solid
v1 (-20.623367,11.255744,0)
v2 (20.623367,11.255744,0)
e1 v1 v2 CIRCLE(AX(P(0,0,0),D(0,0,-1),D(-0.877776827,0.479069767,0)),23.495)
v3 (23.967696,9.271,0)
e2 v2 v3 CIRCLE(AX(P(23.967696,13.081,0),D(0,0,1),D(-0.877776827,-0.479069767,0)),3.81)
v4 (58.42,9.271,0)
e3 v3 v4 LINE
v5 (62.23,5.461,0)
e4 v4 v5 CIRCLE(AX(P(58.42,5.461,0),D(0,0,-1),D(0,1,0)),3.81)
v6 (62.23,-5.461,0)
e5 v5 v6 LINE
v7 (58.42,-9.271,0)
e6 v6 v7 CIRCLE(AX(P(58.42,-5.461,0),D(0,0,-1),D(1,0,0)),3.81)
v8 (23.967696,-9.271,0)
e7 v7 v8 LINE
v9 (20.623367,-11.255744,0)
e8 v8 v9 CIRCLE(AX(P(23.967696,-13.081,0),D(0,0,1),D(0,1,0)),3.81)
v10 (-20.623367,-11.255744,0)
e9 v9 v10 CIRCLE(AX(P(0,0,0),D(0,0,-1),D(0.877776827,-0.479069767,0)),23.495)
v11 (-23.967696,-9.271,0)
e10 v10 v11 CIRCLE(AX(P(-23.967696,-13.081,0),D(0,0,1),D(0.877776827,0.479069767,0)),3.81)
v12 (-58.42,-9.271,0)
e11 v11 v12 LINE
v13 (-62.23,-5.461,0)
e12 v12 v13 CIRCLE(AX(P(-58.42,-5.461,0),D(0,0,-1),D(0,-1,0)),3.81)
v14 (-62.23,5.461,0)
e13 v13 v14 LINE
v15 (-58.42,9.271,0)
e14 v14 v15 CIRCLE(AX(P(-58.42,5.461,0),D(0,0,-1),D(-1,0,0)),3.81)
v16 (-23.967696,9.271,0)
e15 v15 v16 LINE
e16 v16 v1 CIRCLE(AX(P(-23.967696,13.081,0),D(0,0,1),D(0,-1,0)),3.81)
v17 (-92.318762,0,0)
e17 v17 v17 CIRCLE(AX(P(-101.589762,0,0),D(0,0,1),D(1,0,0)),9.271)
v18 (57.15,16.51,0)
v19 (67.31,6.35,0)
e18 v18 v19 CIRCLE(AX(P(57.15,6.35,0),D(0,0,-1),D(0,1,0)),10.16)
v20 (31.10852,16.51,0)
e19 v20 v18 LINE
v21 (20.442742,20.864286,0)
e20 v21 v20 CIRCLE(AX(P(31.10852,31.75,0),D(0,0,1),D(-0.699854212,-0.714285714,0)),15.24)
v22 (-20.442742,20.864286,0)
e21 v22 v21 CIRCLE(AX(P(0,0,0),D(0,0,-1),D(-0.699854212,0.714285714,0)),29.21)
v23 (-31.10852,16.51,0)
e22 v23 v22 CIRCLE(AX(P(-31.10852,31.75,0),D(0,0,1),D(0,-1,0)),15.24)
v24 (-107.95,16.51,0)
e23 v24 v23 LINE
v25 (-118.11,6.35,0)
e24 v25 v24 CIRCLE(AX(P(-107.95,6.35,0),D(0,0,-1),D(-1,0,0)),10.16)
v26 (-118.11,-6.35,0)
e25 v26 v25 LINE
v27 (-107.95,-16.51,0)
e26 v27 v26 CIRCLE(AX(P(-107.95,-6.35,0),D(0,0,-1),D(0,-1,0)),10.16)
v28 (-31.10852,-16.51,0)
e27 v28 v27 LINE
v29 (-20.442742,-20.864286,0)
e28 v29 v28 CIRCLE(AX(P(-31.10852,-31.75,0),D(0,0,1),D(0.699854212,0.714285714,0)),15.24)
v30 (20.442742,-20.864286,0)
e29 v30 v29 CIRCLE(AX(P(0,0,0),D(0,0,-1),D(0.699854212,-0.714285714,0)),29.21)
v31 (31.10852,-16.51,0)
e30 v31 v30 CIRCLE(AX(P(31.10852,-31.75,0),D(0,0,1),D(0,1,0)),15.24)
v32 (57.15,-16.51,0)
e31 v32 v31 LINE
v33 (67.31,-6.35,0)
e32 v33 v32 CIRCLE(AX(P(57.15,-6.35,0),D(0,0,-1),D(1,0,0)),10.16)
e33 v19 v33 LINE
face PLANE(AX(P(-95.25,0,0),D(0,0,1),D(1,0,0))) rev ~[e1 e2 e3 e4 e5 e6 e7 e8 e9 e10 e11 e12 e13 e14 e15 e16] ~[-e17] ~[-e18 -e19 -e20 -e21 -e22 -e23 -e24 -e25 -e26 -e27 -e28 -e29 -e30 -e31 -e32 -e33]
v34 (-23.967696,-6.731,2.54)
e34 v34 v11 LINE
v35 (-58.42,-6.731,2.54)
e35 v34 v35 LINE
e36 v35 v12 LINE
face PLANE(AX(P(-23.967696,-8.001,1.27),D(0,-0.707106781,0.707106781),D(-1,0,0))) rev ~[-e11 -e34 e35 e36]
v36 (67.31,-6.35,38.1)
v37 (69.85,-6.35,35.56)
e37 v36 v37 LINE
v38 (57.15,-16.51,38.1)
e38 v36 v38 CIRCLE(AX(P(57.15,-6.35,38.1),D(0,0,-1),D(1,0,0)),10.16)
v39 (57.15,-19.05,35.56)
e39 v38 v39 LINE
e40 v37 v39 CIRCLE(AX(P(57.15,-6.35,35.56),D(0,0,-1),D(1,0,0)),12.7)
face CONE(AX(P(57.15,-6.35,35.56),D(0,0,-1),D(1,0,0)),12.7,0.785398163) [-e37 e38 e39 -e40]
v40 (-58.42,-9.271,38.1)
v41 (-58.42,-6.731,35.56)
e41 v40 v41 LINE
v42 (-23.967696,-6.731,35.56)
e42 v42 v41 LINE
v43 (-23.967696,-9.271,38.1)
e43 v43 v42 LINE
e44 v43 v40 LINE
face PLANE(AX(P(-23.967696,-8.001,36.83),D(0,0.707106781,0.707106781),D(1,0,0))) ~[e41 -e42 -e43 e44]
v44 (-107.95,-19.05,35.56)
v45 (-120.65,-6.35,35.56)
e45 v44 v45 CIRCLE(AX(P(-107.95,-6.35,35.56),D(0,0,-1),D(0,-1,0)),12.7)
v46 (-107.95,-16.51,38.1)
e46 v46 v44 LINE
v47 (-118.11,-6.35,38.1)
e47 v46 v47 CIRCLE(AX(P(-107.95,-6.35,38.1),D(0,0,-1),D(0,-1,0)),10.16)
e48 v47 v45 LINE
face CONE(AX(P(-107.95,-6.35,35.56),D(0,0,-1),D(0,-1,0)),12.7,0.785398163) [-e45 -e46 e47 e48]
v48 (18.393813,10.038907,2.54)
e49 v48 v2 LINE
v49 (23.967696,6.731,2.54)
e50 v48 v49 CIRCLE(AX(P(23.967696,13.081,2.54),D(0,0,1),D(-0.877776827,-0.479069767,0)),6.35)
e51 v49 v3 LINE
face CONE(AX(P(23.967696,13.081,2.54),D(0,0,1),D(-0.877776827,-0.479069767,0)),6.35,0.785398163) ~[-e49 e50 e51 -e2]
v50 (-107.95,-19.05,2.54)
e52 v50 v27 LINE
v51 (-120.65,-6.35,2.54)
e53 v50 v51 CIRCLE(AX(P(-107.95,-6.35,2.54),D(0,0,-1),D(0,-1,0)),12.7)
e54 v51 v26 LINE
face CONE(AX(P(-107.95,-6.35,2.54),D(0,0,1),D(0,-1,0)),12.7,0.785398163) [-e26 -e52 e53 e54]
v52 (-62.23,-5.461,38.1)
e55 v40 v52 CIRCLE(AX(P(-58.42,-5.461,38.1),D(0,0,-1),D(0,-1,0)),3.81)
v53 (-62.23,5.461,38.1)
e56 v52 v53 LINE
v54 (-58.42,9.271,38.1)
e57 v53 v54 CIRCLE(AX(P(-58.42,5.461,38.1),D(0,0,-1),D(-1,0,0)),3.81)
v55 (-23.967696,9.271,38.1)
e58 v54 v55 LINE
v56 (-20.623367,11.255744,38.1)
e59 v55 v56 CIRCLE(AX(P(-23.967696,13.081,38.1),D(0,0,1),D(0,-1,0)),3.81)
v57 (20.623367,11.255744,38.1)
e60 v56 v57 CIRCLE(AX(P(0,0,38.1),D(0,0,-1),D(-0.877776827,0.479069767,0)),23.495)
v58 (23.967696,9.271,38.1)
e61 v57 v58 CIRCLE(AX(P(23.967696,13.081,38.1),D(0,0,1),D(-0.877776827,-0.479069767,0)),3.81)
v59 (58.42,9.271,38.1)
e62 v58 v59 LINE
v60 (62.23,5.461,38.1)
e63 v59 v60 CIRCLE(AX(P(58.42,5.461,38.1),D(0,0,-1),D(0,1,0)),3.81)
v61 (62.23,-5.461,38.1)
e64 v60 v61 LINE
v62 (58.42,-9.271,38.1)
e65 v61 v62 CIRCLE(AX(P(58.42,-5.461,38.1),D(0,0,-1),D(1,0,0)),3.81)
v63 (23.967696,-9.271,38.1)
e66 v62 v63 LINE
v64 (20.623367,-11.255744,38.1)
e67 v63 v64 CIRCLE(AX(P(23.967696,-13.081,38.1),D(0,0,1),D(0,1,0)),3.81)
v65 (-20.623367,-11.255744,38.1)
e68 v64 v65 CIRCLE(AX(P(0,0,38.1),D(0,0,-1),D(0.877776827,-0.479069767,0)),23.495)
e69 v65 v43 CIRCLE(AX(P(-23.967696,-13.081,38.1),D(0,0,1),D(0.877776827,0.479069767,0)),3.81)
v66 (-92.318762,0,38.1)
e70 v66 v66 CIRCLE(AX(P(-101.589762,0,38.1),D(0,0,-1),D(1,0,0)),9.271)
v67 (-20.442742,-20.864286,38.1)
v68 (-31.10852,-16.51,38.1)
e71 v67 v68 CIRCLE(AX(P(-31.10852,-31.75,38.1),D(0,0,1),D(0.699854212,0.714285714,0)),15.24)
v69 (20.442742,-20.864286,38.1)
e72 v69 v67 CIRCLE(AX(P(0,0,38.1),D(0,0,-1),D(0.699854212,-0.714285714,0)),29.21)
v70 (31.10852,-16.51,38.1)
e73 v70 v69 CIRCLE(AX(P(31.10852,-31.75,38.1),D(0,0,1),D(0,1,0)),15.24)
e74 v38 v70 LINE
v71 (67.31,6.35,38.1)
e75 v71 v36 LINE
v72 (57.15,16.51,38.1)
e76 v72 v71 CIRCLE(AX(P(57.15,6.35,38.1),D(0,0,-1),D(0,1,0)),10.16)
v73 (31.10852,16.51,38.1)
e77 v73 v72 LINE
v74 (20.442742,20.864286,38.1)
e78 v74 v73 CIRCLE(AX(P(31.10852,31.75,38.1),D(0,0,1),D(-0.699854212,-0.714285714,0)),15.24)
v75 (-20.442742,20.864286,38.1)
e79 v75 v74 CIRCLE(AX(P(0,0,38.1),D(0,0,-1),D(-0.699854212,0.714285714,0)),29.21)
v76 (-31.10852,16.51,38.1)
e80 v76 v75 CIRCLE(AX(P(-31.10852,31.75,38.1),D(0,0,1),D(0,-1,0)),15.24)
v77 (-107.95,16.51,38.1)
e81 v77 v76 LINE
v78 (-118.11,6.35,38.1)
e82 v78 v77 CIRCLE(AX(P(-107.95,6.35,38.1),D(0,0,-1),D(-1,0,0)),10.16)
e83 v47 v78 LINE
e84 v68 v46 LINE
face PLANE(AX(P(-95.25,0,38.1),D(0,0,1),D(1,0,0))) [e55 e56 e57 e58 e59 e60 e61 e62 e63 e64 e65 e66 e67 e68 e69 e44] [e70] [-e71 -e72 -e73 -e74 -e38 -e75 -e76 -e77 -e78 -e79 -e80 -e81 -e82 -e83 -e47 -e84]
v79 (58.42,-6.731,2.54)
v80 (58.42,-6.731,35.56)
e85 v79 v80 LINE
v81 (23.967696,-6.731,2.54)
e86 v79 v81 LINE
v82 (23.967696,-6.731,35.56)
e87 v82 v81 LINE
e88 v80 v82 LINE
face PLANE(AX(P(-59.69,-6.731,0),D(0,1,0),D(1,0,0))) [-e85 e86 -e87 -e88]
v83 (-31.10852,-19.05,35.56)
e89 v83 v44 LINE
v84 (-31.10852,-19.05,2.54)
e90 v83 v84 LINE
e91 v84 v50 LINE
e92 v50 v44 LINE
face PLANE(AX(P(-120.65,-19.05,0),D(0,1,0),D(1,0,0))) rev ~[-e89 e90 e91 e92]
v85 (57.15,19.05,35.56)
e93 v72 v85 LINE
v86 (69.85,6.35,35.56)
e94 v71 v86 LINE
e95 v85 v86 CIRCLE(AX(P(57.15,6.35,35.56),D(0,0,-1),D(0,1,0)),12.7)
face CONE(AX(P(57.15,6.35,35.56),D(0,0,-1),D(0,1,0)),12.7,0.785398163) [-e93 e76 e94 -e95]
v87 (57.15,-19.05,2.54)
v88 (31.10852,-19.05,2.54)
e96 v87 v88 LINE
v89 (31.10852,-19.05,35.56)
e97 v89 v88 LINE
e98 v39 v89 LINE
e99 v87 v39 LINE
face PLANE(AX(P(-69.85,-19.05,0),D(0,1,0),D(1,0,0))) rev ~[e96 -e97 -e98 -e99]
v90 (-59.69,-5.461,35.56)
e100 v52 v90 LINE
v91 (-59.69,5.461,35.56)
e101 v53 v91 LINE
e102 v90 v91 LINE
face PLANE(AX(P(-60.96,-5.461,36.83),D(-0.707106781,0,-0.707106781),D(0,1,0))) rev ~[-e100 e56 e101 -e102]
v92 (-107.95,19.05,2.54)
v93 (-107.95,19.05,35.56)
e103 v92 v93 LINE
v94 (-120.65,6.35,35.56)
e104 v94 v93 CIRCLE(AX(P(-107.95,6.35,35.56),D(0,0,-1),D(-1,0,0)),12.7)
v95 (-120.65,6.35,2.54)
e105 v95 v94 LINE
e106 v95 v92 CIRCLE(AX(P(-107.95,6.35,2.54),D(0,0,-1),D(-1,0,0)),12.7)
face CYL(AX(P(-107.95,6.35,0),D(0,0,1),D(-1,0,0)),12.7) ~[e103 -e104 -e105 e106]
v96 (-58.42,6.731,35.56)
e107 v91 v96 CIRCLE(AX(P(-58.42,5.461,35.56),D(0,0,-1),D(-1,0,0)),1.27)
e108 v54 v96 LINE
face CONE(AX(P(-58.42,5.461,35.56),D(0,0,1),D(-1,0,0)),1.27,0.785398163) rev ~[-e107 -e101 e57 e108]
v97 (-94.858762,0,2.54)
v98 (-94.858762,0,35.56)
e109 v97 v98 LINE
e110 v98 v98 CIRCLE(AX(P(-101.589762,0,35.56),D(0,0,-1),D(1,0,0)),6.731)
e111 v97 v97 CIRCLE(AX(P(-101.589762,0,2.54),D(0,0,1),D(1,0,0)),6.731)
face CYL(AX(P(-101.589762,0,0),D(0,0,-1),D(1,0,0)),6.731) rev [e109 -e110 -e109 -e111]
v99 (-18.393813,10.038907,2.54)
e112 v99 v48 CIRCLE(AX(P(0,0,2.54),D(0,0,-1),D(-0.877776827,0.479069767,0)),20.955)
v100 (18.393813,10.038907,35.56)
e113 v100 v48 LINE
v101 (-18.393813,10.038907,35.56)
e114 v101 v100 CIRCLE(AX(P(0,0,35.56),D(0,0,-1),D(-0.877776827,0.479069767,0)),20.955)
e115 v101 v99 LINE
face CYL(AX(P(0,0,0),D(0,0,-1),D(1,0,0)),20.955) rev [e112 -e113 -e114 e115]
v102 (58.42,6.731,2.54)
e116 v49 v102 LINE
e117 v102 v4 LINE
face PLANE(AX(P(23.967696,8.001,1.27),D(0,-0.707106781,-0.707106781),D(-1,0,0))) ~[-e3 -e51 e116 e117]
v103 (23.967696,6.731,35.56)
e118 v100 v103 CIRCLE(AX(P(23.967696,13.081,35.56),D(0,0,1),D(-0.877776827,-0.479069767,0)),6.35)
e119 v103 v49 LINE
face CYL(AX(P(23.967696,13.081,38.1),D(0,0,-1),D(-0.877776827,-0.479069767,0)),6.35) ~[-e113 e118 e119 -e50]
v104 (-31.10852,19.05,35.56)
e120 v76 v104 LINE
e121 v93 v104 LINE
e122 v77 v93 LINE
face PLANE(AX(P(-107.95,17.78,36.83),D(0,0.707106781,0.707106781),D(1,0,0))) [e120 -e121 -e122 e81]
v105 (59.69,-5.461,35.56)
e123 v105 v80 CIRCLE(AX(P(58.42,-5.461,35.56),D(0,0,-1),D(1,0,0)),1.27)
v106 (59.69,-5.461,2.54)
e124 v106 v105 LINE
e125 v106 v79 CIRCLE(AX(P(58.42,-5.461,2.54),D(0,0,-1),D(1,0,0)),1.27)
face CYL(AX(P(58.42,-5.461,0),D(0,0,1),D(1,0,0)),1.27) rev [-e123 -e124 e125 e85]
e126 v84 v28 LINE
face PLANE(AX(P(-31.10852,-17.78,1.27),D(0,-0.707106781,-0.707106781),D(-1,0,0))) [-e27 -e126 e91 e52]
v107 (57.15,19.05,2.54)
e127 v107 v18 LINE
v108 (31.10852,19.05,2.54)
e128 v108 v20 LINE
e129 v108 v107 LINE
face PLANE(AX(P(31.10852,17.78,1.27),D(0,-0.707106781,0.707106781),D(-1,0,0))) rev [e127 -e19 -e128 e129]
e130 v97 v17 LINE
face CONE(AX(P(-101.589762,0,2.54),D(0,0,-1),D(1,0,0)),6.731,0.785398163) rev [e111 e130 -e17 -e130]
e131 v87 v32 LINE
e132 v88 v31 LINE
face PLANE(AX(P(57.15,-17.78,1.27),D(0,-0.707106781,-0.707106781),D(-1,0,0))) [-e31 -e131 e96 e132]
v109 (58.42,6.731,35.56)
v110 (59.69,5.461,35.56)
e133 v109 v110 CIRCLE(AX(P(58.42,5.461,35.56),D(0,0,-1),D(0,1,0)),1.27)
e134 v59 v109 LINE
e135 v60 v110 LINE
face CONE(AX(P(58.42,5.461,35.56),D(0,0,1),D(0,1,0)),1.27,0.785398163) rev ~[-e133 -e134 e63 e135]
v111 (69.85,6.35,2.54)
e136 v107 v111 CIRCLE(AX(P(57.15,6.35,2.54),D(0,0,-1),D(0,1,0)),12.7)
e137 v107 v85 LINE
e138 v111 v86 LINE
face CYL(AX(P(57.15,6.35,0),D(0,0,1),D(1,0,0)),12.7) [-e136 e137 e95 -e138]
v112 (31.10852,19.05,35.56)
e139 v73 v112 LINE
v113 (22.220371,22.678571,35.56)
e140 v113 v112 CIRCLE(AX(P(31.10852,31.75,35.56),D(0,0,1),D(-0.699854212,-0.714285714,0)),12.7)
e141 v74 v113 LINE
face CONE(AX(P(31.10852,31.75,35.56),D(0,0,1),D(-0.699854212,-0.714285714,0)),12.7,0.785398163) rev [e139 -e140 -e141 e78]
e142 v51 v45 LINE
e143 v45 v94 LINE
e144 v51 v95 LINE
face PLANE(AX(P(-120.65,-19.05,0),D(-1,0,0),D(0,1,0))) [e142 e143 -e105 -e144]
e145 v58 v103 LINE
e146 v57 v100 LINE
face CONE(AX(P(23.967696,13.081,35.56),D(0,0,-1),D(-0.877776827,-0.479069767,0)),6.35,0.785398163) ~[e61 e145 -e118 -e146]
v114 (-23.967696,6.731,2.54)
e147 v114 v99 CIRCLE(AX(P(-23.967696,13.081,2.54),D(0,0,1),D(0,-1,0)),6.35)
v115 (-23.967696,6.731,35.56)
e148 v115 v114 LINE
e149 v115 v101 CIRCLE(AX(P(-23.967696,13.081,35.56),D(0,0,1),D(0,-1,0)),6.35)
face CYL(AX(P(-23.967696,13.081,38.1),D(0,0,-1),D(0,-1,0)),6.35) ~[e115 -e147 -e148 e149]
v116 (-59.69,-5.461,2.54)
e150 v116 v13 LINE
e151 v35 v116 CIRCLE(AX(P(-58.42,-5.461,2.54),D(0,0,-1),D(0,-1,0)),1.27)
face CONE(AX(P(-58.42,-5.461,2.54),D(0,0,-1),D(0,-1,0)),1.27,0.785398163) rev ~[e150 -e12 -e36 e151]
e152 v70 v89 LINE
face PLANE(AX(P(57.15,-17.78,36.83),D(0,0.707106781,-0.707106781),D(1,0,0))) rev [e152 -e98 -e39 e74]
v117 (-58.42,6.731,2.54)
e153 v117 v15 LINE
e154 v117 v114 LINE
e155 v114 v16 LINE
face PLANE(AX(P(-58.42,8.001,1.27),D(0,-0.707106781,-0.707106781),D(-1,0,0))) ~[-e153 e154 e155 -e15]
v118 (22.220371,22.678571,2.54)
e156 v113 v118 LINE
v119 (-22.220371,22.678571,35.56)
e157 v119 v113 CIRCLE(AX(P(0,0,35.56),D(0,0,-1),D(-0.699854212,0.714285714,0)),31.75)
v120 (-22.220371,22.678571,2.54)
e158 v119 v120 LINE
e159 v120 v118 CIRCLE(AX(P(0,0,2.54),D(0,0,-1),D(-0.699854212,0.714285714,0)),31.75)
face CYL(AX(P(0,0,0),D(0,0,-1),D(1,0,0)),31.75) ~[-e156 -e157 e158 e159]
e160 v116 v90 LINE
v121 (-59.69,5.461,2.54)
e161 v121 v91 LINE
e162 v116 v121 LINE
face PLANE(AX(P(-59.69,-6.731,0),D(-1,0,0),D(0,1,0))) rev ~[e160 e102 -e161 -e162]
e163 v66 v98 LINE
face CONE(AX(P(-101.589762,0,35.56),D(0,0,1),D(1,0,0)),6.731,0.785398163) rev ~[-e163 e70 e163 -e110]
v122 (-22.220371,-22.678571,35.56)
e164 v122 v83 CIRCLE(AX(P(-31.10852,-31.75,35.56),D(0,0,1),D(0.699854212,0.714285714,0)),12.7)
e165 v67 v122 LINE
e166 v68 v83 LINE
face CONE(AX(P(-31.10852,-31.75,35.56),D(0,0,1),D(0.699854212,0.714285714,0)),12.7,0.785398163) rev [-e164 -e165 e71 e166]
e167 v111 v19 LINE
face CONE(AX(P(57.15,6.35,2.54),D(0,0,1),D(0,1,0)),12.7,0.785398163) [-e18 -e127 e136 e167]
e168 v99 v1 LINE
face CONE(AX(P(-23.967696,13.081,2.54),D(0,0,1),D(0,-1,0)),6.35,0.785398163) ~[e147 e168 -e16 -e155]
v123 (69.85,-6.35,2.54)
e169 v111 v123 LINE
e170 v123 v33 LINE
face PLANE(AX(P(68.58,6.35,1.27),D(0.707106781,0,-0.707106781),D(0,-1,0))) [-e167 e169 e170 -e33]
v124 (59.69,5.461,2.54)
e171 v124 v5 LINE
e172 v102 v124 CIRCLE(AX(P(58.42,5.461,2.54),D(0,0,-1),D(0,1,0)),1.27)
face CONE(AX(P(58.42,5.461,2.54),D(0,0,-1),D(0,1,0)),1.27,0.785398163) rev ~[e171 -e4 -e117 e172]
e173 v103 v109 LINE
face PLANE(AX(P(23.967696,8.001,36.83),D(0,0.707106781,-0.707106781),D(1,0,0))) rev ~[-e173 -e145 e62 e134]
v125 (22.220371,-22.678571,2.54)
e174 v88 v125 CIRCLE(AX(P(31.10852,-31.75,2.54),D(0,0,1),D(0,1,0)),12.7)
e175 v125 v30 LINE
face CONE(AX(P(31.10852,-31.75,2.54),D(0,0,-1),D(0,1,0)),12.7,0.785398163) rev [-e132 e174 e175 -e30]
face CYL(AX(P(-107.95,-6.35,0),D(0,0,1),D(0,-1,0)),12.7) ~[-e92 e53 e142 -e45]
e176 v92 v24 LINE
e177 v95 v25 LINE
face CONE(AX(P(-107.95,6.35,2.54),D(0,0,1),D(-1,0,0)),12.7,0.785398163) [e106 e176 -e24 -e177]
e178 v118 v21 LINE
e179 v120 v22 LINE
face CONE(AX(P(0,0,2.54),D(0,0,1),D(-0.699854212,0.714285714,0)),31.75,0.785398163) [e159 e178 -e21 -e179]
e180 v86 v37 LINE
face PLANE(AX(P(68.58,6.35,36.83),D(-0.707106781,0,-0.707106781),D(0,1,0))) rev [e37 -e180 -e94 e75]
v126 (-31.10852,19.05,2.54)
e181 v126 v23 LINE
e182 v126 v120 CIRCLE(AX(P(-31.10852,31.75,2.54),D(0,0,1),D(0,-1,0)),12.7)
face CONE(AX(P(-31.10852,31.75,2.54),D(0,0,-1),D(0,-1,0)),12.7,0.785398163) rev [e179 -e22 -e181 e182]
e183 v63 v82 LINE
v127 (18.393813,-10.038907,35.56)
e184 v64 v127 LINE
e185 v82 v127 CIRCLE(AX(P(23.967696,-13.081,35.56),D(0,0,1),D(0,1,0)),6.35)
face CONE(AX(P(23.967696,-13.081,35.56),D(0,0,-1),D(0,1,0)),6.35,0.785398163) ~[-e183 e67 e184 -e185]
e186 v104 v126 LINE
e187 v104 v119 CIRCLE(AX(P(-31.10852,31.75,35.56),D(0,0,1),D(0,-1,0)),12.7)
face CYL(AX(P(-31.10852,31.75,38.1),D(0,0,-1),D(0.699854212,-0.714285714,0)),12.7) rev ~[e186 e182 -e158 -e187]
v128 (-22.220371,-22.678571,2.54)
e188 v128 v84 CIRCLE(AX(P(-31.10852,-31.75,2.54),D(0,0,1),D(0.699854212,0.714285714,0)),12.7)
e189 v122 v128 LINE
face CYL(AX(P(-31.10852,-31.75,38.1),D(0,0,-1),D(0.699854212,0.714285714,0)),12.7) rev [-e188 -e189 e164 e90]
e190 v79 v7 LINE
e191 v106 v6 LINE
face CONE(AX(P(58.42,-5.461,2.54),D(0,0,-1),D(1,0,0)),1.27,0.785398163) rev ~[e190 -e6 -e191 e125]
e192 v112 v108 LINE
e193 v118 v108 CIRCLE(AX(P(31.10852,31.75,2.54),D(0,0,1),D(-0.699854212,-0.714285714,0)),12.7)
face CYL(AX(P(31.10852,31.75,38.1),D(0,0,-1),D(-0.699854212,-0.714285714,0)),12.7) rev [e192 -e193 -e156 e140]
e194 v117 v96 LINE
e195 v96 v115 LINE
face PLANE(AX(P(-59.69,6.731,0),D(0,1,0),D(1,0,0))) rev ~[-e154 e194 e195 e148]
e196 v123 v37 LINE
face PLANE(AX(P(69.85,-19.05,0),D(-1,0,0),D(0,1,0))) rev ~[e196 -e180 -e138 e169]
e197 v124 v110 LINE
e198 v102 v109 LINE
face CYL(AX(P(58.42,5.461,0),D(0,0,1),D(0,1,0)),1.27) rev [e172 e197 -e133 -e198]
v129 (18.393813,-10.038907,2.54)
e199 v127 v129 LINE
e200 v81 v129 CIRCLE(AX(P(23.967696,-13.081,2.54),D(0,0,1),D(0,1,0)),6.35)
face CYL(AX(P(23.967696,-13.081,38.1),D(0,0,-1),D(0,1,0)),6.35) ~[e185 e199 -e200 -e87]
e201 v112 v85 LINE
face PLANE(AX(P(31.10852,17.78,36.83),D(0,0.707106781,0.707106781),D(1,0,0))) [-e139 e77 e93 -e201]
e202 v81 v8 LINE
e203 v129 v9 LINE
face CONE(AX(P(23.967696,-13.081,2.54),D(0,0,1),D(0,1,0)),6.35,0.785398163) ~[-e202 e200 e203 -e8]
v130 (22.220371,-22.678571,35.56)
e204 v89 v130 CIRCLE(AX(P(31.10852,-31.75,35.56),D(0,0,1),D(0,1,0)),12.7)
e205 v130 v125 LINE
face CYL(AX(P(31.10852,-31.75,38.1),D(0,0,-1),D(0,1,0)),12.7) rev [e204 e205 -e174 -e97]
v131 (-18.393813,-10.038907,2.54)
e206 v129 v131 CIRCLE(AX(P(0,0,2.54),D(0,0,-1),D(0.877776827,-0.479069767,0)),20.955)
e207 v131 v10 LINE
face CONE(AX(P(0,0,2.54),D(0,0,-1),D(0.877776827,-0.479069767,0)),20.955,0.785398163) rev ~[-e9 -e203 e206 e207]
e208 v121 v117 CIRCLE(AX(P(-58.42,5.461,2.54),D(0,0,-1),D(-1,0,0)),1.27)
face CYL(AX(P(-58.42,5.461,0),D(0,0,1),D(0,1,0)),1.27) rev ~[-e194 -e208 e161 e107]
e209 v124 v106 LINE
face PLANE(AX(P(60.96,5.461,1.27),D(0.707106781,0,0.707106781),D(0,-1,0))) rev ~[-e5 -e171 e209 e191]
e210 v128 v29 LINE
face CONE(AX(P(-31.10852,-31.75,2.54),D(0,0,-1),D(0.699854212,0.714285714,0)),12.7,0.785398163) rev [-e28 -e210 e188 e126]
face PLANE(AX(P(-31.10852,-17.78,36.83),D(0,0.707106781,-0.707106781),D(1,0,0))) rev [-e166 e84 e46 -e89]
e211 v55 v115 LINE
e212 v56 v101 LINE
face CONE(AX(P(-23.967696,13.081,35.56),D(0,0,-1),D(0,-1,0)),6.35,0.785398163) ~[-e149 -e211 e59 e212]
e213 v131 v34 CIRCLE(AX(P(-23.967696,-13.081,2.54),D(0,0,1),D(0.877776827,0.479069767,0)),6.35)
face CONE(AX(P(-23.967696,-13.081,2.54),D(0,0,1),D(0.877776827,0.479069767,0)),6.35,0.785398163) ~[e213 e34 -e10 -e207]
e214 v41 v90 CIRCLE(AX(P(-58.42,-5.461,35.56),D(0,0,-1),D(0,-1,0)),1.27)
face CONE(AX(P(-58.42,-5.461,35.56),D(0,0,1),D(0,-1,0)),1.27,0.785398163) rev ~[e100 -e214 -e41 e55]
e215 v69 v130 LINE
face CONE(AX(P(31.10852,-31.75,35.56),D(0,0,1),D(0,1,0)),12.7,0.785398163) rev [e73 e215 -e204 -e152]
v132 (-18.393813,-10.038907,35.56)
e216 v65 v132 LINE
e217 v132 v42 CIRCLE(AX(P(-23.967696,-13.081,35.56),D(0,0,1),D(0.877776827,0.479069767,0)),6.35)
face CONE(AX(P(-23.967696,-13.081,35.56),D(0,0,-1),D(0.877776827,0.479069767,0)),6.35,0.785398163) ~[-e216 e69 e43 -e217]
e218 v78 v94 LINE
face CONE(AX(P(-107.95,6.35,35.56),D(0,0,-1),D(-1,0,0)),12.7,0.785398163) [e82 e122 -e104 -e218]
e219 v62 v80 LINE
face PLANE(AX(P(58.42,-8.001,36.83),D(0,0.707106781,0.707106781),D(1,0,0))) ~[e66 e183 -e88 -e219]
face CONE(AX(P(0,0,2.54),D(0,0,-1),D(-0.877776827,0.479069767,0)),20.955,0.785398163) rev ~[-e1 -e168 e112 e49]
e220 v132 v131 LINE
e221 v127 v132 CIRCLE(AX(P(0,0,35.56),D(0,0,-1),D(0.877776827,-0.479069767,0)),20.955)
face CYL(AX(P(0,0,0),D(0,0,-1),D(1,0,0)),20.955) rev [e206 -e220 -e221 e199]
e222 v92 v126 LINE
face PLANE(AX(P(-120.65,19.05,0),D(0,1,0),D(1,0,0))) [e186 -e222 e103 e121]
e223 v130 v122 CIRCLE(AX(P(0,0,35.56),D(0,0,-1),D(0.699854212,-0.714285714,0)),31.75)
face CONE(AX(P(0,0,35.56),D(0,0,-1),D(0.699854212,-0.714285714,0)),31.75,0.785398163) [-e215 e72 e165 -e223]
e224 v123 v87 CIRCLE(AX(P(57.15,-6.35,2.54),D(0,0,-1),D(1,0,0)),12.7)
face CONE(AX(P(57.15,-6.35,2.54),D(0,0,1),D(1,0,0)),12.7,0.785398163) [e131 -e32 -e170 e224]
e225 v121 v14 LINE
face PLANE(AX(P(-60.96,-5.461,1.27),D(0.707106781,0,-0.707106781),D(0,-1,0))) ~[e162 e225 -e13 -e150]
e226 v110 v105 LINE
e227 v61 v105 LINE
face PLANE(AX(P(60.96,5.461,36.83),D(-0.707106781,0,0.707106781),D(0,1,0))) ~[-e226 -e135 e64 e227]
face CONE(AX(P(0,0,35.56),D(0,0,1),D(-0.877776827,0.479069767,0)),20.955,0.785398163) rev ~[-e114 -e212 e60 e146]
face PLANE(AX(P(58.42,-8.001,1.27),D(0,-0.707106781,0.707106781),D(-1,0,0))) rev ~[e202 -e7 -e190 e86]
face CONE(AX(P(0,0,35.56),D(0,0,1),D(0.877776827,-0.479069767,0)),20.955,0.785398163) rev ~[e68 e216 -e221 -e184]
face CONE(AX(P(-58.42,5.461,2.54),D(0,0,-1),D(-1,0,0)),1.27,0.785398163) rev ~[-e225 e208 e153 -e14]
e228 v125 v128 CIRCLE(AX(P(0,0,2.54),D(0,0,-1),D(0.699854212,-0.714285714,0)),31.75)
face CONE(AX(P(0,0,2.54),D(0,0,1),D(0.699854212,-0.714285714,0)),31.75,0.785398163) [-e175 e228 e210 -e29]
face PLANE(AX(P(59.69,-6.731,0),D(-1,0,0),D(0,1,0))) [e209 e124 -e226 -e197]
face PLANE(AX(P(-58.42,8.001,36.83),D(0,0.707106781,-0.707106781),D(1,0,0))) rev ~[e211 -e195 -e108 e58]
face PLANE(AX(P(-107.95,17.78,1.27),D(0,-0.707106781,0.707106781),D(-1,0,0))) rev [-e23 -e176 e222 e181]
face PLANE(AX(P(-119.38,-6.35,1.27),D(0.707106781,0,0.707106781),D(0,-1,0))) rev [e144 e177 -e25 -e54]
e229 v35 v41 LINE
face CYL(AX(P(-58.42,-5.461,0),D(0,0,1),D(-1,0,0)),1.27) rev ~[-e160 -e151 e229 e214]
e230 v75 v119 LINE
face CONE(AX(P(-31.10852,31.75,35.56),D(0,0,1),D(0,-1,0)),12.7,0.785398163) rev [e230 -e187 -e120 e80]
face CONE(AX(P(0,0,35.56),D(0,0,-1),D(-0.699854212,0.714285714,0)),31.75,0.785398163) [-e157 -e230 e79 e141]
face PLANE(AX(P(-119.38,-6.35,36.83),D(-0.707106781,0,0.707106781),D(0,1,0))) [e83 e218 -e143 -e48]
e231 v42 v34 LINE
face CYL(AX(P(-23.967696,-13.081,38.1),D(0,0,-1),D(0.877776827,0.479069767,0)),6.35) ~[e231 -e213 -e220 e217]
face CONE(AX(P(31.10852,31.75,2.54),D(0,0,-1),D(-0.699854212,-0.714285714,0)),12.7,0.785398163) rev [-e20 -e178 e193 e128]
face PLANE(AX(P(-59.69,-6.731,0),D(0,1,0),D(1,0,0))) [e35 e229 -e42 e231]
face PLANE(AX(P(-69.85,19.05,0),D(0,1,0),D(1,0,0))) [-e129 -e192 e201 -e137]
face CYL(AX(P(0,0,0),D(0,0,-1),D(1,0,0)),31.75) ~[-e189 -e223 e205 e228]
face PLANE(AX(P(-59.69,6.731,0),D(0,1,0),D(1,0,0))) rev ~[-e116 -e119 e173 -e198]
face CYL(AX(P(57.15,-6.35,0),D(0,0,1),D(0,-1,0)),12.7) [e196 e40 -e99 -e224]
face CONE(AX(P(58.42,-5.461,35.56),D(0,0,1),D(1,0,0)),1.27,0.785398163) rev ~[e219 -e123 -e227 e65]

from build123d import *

# Parameters (mm, degrees)
F0_W      = 139.7
F0_H      = 38.1
F1_DEPTH  = 38.1
F2_R      = 31.75
F3_DEPTH  = 38.1
F4_W      = 119.38
F4_H      = 13.462
F5_DEPTH  = 38.101
F6_R      = 20.955
F7_DEPTH  = 38.101
F8_W      = 50.8
F8_H      = 38.1
F9_DEPTH  = 38.1
F10_R     = 12.7
F11_R     = 6.35
F12_R     = 1.27
F13_R     = 12.7
F14_R     = 6.731
F15_DEPTH = 38.101
F16_SIZE  = 2.54


with BuildPart() as f1:
    # F0 (on Top) → F1 (new body)
    with BuildSketch(Plane.XY):
        Rectangle(F0_W, F0_H)
    extrude(amount=F1_DEPTH)

    # F2 (on Top) → F3 (join, through all)
    with BuildSketch(Plane.XY):
        Circle(F2_R)
    extrude(amount=F3_DEPTH)

    # F4 (on Top) → F5 (cut, through all)
    with BuildSketch(Plane.XY):
        Rectangle(F4_W, F4_H)
    extrude(amount=F5_DEPTH, mode=Mode.SUBTRACT)

    # F6 (on Top) → F7 (cut, through all)
    with BuildSketch(Plane.XY):
        Circle(F6_R)
    extrude(amount=F7_DEPTH, mode=Mode.SUBTRACT)

    # F8 (on Top) → F9 (join, through all)
    with BuildSketch(Plane.XY):
        with Locations((-95.25, 0)):
            Rectangle(F8_W, F8_H)
    extrude(amount=F9_DEPTH)

    # F10
    f10_edges = [f1.edges().sort_by_distance(p)[0] for p in [
        (25.4, -19.05, 19.05),
        (-25.4, -19.05, 19.05),
        (25.4, 19.05, 19.05),
        (-25.4, 19.05, 19.05),
    ]]
    fillet(f10_edges, radius=F10_R)

    # F11
    f11_edges = [f1.edges().sort_by_distance(p)[0] for p in [
        (-19.844537, -6.731, 19.05),
        (19.844537, -6.731, 19.05),
        (19.844537, 6.731, 19.05),
        (-19.844537, 6.731, 19.05),
    ]]
    fillet(f11_edges, radius=F11_R)

    # F12
    f12_edges = [f1.edges().sort_by_distance(p)[0] for p in [
        (59.69, 6.731, 19.05),
        (-59.69, 6.731, 19.05),
        (-59.69, -6.731, 19.05),
        (59.69, -6.731, 19.05),
    ]]
    fillet(f12_edges, radius=F12_R)

    # F13
    f13_edges = [f1.edges().sort_by_distance(p)[0] for p in [
        (-58.42, 6.731, 19.05),
        (-58.42, -6.731, 19.05),
        (69.85, 19.05, 19.05),
        (69.85, -19.05, 19.05),
        (-120.65, -19.05, 19.05),
        (-120.65, 19.05, 19.05),
    ]]
    fillet(f13_edges, radius=F13_R)

    # F14 (on Top) → F15 (cut, through all)
    with BuildSketch(Plane.XY):
        with Locations((-101.5897616744, 0)):
            Circle(F14_R)
    extrude(amount=F15_DEPTH, mode=Mode.SUBTRACT)

    # F16
    f16_edges = [f1.edges().sort_by_distance(p)[0] for p in [
        (44.12926, 19.05, 38.1),
        (66.130256, 15.330256, 38.1),
        (26.308371, 19.992085, 38.1),
        (69.85, 0, 38.1),
        (0, 31.75, 38.1),
        (66.130256, -15.330256, 38.1),
        (-26.308371, 19.992085, 38.1),
        (44.12926, -19.05, 38.1),
        (-69.52926, 19.05, 38.1),
        (26.308371, -19.992085, 38.1),
        (-116.930256, 15.330256, 38.1),
        (0, -31.75, 38.1),
        (-120.65, 0, 38.1),
        (-26.308371, -19.992085, 38.1),
        (-116.930256, -15.330256, 38.1),
        (-69.52926, -19.05, 38.1),
        (-108.320762, 0, 38.1),
        (-41.193848, -6.731, 38.1),
        (-59.318026, -6.359026, 38.1),
        (-20.726924, -7.62024, 38.1),
        (-59.69, 0, 38.1),
        (0, -20.955, 38.1),
        (-59.318026, 6.359026, 38.1),
        (20.726924, -7.62024, 38.1),
        (-41.193848, 6.731, 38.1),
        (41.193848, -6.731, 38.1),
        (-20.726924, 7.62024, 38.1),
        (59.318026, -6.359026, 38.1),
        (0, 20.955, 38.1),
        (59.69, 0, 38.1),
        (20.726924, 7.62024, 38.1),
        (59.318026, 6.359026, 38.1),
        (41.193848, 6.731, 38.1),
        (44.12926, 19.05, 0),
        (66.130256, 15.330256, 0),
        (26.308371, 19.992085, 0),
        (69.85, 0, 0),
        (0, 31.75, 0),
        (66.130256, -15.330256, 0),
        (-26.308371, 19.992085, 0),
        (44.12926, -19.05, 0),
        (-69.52926, 19.05, 0),
        (26.308371, -19.992085, 0),
        (-116.930256, 15.330256, 0),
        (0, -31.75, 0),
        (-120.65, 0, 0),
        (-26.308371, -19.992085, 0),
        (-116.930256, -15.330256, 0),
        (-69.52926, -19.05, 0),
        (-108.320762, 0, 0),
        (41.193848, 6.731, 0),
        (59.318026, 6.359026, 0),
        (20.726924, 7.62024, 0),
        (59.69, 0, 0),
        (0, 20.955, 0),
        (59.318026, -6.359026, 0),
        (-20.726924, 7.62024, 0),
        (41.193848, -6.731, 0),
        (-41.193848, 6.731, 0),
        (20.726924, -7.62024, 0),
        (-59.318026, 6.359026, 0),
        (0, -20.955, 0),
        (-59.69, 0, 0),
        (-20.726924, -7.62024, 0),
        (-59.318026, -6.359026, 0),
        (-41.193848, -6.731, 0),
    ]]
    chamfer(f16_edges, length=F16_SIZE)


solid = f1.part
